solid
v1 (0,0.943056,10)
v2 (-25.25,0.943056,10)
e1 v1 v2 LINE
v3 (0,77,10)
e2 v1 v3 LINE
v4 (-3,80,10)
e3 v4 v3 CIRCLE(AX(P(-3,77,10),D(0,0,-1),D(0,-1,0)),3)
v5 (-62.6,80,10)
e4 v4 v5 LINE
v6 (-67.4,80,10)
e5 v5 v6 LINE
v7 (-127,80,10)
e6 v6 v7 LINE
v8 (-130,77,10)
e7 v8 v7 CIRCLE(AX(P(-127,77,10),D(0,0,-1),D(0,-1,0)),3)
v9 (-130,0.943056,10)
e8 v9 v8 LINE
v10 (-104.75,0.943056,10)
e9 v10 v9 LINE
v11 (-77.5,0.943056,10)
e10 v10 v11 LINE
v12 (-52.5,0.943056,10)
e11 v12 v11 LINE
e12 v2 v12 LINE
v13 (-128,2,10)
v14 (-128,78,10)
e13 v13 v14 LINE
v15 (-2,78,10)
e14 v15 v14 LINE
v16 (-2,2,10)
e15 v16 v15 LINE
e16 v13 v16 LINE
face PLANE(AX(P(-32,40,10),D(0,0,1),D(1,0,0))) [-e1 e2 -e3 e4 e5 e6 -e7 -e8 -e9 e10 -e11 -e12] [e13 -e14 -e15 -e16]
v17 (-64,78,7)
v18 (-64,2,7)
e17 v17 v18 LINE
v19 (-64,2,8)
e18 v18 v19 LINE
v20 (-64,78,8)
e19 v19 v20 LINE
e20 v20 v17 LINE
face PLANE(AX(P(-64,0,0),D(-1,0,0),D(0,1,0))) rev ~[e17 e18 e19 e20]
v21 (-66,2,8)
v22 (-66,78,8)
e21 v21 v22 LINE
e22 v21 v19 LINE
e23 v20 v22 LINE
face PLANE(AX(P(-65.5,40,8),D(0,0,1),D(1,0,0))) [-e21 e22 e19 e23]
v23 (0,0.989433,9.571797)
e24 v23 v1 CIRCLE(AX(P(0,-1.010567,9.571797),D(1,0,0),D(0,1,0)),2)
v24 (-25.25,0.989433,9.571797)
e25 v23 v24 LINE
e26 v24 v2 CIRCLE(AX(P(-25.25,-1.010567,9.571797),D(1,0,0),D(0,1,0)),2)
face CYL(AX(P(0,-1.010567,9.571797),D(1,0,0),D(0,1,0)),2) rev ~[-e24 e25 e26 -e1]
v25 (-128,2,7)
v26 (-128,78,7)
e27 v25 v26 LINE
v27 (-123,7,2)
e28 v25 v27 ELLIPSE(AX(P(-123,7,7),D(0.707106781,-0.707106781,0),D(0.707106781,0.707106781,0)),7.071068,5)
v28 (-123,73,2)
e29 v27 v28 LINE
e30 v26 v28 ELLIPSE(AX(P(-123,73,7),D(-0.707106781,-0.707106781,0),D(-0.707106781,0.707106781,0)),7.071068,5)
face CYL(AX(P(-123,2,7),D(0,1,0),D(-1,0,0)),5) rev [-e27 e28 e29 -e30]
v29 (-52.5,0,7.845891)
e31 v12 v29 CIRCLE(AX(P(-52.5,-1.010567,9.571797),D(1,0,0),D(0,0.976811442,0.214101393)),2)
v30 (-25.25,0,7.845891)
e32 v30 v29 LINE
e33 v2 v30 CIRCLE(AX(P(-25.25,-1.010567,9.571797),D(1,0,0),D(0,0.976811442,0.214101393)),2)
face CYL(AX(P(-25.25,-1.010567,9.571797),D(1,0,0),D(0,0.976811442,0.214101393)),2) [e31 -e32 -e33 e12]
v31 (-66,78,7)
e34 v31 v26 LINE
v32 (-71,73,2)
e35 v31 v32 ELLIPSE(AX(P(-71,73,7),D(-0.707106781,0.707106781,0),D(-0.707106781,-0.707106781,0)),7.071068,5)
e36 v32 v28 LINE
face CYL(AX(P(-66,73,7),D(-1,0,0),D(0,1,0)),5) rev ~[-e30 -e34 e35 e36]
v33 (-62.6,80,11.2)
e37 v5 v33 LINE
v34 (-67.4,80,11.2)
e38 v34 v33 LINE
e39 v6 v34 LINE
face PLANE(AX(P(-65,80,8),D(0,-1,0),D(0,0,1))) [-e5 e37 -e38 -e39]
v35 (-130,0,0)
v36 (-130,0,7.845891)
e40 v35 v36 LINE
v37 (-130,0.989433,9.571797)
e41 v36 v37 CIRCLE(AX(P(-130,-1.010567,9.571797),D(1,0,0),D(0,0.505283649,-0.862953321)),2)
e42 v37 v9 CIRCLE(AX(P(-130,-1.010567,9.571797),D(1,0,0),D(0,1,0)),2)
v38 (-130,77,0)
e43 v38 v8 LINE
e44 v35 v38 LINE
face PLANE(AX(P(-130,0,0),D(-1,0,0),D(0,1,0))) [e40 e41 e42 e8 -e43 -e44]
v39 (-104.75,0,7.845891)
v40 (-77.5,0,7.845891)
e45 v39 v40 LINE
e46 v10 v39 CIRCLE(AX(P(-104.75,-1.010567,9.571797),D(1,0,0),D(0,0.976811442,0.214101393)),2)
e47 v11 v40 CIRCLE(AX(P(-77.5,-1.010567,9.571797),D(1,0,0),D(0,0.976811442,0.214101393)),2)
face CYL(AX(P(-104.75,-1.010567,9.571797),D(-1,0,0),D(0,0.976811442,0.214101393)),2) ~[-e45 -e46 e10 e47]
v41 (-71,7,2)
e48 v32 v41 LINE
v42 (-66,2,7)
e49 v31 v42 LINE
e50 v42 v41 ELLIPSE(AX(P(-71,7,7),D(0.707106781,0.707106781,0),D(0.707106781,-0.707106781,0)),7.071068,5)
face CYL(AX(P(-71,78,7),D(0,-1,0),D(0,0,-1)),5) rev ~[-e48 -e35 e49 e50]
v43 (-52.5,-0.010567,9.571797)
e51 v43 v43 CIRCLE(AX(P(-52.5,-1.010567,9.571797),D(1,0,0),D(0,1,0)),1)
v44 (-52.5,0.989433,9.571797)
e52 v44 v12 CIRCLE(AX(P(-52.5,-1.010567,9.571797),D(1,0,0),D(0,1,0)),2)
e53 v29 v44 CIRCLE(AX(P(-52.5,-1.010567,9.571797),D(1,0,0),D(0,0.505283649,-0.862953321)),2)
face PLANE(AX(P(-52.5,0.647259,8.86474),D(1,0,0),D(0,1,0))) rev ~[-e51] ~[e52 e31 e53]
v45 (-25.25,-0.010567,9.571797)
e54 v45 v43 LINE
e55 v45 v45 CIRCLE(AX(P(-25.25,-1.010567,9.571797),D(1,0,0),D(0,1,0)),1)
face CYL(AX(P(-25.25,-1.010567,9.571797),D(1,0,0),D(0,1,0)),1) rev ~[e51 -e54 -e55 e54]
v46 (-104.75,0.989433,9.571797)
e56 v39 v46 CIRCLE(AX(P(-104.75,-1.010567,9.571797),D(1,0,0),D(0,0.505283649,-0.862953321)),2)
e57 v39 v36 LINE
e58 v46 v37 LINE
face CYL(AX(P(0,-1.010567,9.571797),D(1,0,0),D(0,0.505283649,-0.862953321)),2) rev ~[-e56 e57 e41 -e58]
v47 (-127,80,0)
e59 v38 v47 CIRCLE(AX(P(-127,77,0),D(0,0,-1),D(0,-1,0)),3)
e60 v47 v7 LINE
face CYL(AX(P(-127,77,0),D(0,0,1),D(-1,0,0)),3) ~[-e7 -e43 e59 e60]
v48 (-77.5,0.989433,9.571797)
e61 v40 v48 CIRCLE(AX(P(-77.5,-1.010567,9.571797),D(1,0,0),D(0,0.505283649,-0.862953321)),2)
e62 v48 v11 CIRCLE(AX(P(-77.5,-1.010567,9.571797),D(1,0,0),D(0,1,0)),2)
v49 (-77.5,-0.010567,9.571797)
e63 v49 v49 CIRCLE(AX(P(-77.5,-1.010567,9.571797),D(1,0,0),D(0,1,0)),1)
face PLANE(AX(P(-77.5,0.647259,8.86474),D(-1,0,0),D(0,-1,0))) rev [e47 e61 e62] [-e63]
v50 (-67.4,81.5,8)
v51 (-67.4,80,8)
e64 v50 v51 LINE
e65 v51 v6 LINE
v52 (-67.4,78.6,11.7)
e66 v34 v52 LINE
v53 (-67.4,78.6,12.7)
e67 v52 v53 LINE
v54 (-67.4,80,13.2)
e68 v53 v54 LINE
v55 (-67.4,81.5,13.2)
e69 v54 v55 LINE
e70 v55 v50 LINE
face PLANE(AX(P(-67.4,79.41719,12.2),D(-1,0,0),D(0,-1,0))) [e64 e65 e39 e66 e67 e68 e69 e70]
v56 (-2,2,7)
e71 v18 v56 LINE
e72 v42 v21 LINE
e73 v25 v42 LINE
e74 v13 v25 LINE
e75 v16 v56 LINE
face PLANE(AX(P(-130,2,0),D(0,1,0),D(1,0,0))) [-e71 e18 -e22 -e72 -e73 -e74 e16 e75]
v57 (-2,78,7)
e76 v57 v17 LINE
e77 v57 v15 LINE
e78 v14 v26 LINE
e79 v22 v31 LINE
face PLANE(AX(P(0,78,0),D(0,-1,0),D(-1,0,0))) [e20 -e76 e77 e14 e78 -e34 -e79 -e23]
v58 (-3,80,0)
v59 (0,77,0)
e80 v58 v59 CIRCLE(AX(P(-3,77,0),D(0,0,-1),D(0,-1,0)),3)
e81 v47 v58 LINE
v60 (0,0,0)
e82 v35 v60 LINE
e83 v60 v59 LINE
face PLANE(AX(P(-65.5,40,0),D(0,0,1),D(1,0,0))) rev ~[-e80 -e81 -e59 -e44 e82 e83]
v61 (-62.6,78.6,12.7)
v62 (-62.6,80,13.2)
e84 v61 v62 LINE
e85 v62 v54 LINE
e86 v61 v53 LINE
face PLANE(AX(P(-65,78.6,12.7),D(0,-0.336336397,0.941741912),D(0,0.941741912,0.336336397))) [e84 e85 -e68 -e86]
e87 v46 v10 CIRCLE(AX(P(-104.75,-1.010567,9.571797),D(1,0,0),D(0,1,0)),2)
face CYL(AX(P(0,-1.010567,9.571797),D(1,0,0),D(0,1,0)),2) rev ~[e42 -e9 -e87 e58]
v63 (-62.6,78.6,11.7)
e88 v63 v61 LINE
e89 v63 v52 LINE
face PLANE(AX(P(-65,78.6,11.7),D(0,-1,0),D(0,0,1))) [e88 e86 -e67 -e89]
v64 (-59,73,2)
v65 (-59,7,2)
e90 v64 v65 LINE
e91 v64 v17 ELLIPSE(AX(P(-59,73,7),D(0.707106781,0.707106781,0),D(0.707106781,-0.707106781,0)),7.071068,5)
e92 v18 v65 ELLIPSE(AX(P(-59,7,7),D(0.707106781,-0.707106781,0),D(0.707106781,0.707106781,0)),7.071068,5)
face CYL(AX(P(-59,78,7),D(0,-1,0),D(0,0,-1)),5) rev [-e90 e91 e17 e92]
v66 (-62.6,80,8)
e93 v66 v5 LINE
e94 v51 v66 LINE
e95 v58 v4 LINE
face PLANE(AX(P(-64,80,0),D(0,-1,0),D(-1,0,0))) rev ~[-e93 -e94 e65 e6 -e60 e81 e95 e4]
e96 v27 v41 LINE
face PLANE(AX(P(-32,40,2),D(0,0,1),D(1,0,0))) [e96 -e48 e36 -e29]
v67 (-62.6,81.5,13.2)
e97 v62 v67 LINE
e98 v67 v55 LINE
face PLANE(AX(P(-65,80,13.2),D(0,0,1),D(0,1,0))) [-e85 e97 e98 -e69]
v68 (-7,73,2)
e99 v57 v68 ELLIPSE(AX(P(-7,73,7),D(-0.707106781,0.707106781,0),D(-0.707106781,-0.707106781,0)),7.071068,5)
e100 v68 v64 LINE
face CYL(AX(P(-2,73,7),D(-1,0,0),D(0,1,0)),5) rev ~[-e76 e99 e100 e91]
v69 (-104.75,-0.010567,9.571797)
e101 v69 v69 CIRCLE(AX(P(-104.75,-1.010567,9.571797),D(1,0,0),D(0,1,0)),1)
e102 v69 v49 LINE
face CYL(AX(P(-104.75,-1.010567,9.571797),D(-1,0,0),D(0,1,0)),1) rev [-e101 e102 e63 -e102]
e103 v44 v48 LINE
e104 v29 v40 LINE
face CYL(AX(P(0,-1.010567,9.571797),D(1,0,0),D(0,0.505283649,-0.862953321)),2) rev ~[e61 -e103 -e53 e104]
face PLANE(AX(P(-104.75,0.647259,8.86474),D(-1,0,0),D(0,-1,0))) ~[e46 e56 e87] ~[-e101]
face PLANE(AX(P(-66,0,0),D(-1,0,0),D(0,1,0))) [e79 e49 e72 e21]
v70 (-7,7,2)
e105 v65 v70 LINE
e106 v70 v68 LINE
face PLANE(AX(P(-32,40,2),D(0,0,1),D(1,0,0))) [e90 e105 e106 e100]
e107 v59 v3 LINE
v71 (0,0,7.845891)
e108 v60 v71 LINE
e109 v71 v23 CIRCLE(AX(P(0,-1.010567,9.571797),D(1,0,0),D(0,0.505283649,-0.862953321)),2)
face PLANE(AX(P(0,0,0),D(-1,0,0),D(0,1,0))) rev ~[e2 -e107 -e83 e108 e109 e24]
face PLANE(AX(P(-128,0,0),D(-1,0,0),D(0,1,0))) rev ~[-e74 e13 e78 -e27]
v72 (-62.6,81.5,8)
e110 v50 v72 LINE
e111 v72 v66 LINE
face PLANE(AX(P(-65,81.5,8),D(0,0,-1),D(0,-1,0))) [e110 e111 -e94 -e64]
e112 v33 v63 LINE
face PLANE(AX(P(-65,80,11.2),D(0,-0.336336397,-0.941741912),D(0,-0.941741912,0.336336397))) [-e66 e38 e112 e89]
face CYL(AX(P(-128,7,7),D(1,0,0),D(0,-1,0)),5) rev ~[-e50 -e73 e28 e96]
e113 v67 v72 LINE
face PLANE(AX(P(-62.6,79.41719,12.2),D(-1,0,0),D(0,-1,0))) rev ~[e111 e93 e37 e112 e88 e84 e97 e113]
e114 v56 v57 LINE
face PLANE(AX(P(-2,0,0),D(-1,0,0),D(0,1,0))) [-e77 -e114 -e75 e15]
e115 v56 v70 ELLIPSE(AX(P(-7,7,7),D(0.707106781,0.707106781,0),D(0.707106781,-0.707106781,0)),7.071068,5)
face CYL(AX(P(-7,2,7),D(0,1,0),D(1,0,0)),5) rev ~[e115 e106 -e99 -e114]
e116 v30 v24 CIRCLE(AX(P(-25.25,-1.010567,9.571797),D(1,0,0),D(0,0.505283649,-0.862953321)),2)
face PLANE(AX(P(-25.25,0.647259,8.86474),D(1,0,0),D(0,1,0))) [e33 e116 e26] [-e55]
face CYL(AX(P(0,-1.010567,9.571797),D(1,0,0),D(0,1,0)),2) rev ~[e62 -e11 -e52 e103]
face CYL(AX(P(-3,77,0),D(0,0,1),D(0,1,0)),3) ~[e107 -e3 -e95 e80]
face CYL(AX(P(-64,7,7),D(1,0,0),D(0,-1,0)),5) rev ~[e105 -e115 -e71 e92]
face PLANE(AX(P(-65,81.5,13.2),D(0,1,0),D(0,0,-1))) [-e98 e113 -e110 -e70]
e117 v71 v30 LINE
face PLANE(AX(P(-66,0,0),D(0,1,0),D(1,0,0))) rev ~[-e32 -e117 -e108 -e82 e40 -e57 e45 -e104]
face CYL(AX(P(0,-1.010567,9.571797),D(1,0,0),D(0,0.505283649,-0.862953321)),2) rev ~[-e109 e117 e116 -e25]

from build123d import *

# Parameters (mm, degrees)
F0_W     = 64
F0_H     = 80
F0_W_2   = 1
F1_DEPTH = 10
F2_T     = -2
F3_DEPTH = 8
F5_DEPTH = 130.001
F6_START = -25.25
F4_R     = 1
F6_DEPTH = 27.25
F8_W     = 1.5
F8_H     = 2
F9_DEPTH = 2.4
F10_R    = 5
F11_R    = 3


# Not quite as in the source:
# - a pattern or mirror of a feature is missing from the dataset's text; its kind, count and spacing are read off the source's solid


with BuildPart() as f1:
    # F0 (on Top) → F1 (new body)
    with BuildSketch(Plane.XY):
        with Locations((-32, 40)):
            Rectangle(F0_W, F0_H)
        with Locations((-64.5, 40)):
            Rectangle(F0_W_2, F0_H)
        with Locations((-65.5, 40)):
            Rectangle(F0_W_2, F0_H)
        with Locations((-98, 40)):
            Rectangle(F0_W, F0_H)
    extrude(amount=F1_DEPTH)

    # F2
    f2_openings = [f1.faces().sort_by_distance(p)[0] for p in [
        (-65, 40, 10),
    ]]
    offset(amount=F2_T, openings=f2_openings)

    # F0 (on Top) → F3 (join)
    with BuildSketch(Plane.XY):
        with Locations((-65.5, 40)):
            Rectangle(F0_W_2, F0_H)
        with Locations((-64.5, 40)):
            Rectangle(F0_W_2, F0_H)
    extrude(amount=F3_DEPTH)

    # F4 (on face) → F5 (cut, through all)
    with BuildSketch(Plane.YZ):
        with BuildLine():
            ThreePointArc((0, 7.8458905733), (0.7245313434, 8.5770948967), (0.9894327009, 9.5717972144))
            ThreePointArc((0.9894327009, 9.5717972144), (0.9778046189, 9.7871506811), (0.9430555853, 10))
            Line((0.9430555853, 10), (0.840551923, 10))
            ThreePointArc((0.840551923, 10), (0.8771729534, 9.7872890681), (0.8894327009, 9.5717972144))
            ThreePointArc((0.8894327009, 9.5717972144), (0.6522733229, 8.6525795765), (0, 7.9628367631))
            Line((0, 7.9628367631), (0, 7.8458905733))
        make_face()
        with BuildLine():
            ThreePointArc((0.8894327009, 9.5717972144), (0.8771729534, 9.7872890681), (0.840551923, 10))
            Line((0.840551923, 10), (0, 10))
            Line((0, 10), (0, 7.9628367631))
            ThreePointArc((0, 7.9628367631), (0.6522733229, 8.6525795765), (0.8894327009, 9.5717972144))
        make_face()
    extrude(amount=-F5_DEPTH, mode=Mode.SUBTRACT)

    # F4 (on face) → F6 (join)
    with BuildSketch(Plane.YZ.offset(F6_START)):
        with BuildLine():
            ThreePointArc((0, 7.8458905733), (0.7245313434, 8.5770948967), (0.9894327009, 9.5717972144))
            ThreePointArc((0.9894327009, 9.5717972144), (0.9778046189, 9.7871506811), (0.9430555853, 10))
            Line((0.9430555853, 10), (0.840551923, 10))
            ThreePointArc((0.840551923, 10), (0.8771729534, 9.7872890681), (0.8894327009, 9.5717972144))
            ThreePointArc((0.8894327009, 9.5717972144), (0.6522733229, 8.6525795765), (0, 7.9628367631))
            Line((0, 7.9628367631), (0, 7.8458905733))
        make_face()
        with BuildLine():
            Line((0.840551923, 10), (0.9430555853, 10))
            ThreePointArc((0.9430555853, 10), (-2.8426843031, 10.3738865383), (0, 7.8458905733))
            Line((0, 7.8458905733), (0, 7.9628367631))
            ThreePointArc((0, 7.9628367631), (-2.7669331351, 10.2964895976), (0.840551923, 10))
        make_face()
        with BuildLine():
            ThreePointArc((0.8894327009, 9.5717972144), (0.8771729534, 9.7872890681), (0.840551923, 10))
            Line((0.840551923, 10), (0, 10))
            Line((0, 10), (0, 7.9628367631))
            ThreePointArc((0, 7.9628367631), (0.6522733229, 8.6525795765), (0.8894327009, 9.5717972144))
        make_face()
        with BuildLine():
            Line((0, 10), (0.840551923, 10))
            ThreePointArc((0.840551923, 10), (-2.7669331351, 10.2964895976), (0, 7.9628367631))
            Line((0, 7.9628367631), (0, 10))
        make_face()
        with Locations((-1.0105672991, 9.5717972144)):
            Circle(F4_R, mode=Mode.SUBTRACT)
    f6 = extrude(amount=-F6_DEPTH)

    # F6_copies: F6 across plane
    add(f6.mirror(Plane(origin=(-65, 0, 0), x_dir=(0, 0, -1), z_dir=(-1, 0, 0))))

    # F8 (on mid) → F9 (join, symmetric)
    with BuildSketch(Plane(origin=(-65, 0, 0), x_dir=(0, -1, 0), z_dir=(-1, 0, 0))):
        Polygon((-80, 13.2), (-80, 11.2), (-78.6, 11.7), (-78.6, 12.7), align=None)
        Polygon((-81.5, 10), (-80, 10), (-80, 11.2), (-80, 13.2), (-81.5, 13.2), align=None)
        with Locations((-80.75, 9)):
            Rectangle(F8_W, F8_H)
    extrude(amount=F9_DEPTH, both=True)

    # F10
    f10_edges = [f1.edges().sort_by_distance(p)[0] for p in [
        (-33, 2, 2),
        (-64, 40, 2),
        (-33, 78, 2),
        (-2, 40, 2),
        (-97, 2, 2),
        (-128, 40, 2),
        (-97, 78, 2),
        (-66, 40, 2),
    ]]
    fillet(f10_edges, radius=F10_R)

    # F11
    f11_edges = [f1.edges().sort_by_distance(p)[0] for p in [
        (-130, 80, 5),
        (0, 80, 5),
    ]]
    fillet(f11_edges, radius=F11_R)


solid = f1.part
